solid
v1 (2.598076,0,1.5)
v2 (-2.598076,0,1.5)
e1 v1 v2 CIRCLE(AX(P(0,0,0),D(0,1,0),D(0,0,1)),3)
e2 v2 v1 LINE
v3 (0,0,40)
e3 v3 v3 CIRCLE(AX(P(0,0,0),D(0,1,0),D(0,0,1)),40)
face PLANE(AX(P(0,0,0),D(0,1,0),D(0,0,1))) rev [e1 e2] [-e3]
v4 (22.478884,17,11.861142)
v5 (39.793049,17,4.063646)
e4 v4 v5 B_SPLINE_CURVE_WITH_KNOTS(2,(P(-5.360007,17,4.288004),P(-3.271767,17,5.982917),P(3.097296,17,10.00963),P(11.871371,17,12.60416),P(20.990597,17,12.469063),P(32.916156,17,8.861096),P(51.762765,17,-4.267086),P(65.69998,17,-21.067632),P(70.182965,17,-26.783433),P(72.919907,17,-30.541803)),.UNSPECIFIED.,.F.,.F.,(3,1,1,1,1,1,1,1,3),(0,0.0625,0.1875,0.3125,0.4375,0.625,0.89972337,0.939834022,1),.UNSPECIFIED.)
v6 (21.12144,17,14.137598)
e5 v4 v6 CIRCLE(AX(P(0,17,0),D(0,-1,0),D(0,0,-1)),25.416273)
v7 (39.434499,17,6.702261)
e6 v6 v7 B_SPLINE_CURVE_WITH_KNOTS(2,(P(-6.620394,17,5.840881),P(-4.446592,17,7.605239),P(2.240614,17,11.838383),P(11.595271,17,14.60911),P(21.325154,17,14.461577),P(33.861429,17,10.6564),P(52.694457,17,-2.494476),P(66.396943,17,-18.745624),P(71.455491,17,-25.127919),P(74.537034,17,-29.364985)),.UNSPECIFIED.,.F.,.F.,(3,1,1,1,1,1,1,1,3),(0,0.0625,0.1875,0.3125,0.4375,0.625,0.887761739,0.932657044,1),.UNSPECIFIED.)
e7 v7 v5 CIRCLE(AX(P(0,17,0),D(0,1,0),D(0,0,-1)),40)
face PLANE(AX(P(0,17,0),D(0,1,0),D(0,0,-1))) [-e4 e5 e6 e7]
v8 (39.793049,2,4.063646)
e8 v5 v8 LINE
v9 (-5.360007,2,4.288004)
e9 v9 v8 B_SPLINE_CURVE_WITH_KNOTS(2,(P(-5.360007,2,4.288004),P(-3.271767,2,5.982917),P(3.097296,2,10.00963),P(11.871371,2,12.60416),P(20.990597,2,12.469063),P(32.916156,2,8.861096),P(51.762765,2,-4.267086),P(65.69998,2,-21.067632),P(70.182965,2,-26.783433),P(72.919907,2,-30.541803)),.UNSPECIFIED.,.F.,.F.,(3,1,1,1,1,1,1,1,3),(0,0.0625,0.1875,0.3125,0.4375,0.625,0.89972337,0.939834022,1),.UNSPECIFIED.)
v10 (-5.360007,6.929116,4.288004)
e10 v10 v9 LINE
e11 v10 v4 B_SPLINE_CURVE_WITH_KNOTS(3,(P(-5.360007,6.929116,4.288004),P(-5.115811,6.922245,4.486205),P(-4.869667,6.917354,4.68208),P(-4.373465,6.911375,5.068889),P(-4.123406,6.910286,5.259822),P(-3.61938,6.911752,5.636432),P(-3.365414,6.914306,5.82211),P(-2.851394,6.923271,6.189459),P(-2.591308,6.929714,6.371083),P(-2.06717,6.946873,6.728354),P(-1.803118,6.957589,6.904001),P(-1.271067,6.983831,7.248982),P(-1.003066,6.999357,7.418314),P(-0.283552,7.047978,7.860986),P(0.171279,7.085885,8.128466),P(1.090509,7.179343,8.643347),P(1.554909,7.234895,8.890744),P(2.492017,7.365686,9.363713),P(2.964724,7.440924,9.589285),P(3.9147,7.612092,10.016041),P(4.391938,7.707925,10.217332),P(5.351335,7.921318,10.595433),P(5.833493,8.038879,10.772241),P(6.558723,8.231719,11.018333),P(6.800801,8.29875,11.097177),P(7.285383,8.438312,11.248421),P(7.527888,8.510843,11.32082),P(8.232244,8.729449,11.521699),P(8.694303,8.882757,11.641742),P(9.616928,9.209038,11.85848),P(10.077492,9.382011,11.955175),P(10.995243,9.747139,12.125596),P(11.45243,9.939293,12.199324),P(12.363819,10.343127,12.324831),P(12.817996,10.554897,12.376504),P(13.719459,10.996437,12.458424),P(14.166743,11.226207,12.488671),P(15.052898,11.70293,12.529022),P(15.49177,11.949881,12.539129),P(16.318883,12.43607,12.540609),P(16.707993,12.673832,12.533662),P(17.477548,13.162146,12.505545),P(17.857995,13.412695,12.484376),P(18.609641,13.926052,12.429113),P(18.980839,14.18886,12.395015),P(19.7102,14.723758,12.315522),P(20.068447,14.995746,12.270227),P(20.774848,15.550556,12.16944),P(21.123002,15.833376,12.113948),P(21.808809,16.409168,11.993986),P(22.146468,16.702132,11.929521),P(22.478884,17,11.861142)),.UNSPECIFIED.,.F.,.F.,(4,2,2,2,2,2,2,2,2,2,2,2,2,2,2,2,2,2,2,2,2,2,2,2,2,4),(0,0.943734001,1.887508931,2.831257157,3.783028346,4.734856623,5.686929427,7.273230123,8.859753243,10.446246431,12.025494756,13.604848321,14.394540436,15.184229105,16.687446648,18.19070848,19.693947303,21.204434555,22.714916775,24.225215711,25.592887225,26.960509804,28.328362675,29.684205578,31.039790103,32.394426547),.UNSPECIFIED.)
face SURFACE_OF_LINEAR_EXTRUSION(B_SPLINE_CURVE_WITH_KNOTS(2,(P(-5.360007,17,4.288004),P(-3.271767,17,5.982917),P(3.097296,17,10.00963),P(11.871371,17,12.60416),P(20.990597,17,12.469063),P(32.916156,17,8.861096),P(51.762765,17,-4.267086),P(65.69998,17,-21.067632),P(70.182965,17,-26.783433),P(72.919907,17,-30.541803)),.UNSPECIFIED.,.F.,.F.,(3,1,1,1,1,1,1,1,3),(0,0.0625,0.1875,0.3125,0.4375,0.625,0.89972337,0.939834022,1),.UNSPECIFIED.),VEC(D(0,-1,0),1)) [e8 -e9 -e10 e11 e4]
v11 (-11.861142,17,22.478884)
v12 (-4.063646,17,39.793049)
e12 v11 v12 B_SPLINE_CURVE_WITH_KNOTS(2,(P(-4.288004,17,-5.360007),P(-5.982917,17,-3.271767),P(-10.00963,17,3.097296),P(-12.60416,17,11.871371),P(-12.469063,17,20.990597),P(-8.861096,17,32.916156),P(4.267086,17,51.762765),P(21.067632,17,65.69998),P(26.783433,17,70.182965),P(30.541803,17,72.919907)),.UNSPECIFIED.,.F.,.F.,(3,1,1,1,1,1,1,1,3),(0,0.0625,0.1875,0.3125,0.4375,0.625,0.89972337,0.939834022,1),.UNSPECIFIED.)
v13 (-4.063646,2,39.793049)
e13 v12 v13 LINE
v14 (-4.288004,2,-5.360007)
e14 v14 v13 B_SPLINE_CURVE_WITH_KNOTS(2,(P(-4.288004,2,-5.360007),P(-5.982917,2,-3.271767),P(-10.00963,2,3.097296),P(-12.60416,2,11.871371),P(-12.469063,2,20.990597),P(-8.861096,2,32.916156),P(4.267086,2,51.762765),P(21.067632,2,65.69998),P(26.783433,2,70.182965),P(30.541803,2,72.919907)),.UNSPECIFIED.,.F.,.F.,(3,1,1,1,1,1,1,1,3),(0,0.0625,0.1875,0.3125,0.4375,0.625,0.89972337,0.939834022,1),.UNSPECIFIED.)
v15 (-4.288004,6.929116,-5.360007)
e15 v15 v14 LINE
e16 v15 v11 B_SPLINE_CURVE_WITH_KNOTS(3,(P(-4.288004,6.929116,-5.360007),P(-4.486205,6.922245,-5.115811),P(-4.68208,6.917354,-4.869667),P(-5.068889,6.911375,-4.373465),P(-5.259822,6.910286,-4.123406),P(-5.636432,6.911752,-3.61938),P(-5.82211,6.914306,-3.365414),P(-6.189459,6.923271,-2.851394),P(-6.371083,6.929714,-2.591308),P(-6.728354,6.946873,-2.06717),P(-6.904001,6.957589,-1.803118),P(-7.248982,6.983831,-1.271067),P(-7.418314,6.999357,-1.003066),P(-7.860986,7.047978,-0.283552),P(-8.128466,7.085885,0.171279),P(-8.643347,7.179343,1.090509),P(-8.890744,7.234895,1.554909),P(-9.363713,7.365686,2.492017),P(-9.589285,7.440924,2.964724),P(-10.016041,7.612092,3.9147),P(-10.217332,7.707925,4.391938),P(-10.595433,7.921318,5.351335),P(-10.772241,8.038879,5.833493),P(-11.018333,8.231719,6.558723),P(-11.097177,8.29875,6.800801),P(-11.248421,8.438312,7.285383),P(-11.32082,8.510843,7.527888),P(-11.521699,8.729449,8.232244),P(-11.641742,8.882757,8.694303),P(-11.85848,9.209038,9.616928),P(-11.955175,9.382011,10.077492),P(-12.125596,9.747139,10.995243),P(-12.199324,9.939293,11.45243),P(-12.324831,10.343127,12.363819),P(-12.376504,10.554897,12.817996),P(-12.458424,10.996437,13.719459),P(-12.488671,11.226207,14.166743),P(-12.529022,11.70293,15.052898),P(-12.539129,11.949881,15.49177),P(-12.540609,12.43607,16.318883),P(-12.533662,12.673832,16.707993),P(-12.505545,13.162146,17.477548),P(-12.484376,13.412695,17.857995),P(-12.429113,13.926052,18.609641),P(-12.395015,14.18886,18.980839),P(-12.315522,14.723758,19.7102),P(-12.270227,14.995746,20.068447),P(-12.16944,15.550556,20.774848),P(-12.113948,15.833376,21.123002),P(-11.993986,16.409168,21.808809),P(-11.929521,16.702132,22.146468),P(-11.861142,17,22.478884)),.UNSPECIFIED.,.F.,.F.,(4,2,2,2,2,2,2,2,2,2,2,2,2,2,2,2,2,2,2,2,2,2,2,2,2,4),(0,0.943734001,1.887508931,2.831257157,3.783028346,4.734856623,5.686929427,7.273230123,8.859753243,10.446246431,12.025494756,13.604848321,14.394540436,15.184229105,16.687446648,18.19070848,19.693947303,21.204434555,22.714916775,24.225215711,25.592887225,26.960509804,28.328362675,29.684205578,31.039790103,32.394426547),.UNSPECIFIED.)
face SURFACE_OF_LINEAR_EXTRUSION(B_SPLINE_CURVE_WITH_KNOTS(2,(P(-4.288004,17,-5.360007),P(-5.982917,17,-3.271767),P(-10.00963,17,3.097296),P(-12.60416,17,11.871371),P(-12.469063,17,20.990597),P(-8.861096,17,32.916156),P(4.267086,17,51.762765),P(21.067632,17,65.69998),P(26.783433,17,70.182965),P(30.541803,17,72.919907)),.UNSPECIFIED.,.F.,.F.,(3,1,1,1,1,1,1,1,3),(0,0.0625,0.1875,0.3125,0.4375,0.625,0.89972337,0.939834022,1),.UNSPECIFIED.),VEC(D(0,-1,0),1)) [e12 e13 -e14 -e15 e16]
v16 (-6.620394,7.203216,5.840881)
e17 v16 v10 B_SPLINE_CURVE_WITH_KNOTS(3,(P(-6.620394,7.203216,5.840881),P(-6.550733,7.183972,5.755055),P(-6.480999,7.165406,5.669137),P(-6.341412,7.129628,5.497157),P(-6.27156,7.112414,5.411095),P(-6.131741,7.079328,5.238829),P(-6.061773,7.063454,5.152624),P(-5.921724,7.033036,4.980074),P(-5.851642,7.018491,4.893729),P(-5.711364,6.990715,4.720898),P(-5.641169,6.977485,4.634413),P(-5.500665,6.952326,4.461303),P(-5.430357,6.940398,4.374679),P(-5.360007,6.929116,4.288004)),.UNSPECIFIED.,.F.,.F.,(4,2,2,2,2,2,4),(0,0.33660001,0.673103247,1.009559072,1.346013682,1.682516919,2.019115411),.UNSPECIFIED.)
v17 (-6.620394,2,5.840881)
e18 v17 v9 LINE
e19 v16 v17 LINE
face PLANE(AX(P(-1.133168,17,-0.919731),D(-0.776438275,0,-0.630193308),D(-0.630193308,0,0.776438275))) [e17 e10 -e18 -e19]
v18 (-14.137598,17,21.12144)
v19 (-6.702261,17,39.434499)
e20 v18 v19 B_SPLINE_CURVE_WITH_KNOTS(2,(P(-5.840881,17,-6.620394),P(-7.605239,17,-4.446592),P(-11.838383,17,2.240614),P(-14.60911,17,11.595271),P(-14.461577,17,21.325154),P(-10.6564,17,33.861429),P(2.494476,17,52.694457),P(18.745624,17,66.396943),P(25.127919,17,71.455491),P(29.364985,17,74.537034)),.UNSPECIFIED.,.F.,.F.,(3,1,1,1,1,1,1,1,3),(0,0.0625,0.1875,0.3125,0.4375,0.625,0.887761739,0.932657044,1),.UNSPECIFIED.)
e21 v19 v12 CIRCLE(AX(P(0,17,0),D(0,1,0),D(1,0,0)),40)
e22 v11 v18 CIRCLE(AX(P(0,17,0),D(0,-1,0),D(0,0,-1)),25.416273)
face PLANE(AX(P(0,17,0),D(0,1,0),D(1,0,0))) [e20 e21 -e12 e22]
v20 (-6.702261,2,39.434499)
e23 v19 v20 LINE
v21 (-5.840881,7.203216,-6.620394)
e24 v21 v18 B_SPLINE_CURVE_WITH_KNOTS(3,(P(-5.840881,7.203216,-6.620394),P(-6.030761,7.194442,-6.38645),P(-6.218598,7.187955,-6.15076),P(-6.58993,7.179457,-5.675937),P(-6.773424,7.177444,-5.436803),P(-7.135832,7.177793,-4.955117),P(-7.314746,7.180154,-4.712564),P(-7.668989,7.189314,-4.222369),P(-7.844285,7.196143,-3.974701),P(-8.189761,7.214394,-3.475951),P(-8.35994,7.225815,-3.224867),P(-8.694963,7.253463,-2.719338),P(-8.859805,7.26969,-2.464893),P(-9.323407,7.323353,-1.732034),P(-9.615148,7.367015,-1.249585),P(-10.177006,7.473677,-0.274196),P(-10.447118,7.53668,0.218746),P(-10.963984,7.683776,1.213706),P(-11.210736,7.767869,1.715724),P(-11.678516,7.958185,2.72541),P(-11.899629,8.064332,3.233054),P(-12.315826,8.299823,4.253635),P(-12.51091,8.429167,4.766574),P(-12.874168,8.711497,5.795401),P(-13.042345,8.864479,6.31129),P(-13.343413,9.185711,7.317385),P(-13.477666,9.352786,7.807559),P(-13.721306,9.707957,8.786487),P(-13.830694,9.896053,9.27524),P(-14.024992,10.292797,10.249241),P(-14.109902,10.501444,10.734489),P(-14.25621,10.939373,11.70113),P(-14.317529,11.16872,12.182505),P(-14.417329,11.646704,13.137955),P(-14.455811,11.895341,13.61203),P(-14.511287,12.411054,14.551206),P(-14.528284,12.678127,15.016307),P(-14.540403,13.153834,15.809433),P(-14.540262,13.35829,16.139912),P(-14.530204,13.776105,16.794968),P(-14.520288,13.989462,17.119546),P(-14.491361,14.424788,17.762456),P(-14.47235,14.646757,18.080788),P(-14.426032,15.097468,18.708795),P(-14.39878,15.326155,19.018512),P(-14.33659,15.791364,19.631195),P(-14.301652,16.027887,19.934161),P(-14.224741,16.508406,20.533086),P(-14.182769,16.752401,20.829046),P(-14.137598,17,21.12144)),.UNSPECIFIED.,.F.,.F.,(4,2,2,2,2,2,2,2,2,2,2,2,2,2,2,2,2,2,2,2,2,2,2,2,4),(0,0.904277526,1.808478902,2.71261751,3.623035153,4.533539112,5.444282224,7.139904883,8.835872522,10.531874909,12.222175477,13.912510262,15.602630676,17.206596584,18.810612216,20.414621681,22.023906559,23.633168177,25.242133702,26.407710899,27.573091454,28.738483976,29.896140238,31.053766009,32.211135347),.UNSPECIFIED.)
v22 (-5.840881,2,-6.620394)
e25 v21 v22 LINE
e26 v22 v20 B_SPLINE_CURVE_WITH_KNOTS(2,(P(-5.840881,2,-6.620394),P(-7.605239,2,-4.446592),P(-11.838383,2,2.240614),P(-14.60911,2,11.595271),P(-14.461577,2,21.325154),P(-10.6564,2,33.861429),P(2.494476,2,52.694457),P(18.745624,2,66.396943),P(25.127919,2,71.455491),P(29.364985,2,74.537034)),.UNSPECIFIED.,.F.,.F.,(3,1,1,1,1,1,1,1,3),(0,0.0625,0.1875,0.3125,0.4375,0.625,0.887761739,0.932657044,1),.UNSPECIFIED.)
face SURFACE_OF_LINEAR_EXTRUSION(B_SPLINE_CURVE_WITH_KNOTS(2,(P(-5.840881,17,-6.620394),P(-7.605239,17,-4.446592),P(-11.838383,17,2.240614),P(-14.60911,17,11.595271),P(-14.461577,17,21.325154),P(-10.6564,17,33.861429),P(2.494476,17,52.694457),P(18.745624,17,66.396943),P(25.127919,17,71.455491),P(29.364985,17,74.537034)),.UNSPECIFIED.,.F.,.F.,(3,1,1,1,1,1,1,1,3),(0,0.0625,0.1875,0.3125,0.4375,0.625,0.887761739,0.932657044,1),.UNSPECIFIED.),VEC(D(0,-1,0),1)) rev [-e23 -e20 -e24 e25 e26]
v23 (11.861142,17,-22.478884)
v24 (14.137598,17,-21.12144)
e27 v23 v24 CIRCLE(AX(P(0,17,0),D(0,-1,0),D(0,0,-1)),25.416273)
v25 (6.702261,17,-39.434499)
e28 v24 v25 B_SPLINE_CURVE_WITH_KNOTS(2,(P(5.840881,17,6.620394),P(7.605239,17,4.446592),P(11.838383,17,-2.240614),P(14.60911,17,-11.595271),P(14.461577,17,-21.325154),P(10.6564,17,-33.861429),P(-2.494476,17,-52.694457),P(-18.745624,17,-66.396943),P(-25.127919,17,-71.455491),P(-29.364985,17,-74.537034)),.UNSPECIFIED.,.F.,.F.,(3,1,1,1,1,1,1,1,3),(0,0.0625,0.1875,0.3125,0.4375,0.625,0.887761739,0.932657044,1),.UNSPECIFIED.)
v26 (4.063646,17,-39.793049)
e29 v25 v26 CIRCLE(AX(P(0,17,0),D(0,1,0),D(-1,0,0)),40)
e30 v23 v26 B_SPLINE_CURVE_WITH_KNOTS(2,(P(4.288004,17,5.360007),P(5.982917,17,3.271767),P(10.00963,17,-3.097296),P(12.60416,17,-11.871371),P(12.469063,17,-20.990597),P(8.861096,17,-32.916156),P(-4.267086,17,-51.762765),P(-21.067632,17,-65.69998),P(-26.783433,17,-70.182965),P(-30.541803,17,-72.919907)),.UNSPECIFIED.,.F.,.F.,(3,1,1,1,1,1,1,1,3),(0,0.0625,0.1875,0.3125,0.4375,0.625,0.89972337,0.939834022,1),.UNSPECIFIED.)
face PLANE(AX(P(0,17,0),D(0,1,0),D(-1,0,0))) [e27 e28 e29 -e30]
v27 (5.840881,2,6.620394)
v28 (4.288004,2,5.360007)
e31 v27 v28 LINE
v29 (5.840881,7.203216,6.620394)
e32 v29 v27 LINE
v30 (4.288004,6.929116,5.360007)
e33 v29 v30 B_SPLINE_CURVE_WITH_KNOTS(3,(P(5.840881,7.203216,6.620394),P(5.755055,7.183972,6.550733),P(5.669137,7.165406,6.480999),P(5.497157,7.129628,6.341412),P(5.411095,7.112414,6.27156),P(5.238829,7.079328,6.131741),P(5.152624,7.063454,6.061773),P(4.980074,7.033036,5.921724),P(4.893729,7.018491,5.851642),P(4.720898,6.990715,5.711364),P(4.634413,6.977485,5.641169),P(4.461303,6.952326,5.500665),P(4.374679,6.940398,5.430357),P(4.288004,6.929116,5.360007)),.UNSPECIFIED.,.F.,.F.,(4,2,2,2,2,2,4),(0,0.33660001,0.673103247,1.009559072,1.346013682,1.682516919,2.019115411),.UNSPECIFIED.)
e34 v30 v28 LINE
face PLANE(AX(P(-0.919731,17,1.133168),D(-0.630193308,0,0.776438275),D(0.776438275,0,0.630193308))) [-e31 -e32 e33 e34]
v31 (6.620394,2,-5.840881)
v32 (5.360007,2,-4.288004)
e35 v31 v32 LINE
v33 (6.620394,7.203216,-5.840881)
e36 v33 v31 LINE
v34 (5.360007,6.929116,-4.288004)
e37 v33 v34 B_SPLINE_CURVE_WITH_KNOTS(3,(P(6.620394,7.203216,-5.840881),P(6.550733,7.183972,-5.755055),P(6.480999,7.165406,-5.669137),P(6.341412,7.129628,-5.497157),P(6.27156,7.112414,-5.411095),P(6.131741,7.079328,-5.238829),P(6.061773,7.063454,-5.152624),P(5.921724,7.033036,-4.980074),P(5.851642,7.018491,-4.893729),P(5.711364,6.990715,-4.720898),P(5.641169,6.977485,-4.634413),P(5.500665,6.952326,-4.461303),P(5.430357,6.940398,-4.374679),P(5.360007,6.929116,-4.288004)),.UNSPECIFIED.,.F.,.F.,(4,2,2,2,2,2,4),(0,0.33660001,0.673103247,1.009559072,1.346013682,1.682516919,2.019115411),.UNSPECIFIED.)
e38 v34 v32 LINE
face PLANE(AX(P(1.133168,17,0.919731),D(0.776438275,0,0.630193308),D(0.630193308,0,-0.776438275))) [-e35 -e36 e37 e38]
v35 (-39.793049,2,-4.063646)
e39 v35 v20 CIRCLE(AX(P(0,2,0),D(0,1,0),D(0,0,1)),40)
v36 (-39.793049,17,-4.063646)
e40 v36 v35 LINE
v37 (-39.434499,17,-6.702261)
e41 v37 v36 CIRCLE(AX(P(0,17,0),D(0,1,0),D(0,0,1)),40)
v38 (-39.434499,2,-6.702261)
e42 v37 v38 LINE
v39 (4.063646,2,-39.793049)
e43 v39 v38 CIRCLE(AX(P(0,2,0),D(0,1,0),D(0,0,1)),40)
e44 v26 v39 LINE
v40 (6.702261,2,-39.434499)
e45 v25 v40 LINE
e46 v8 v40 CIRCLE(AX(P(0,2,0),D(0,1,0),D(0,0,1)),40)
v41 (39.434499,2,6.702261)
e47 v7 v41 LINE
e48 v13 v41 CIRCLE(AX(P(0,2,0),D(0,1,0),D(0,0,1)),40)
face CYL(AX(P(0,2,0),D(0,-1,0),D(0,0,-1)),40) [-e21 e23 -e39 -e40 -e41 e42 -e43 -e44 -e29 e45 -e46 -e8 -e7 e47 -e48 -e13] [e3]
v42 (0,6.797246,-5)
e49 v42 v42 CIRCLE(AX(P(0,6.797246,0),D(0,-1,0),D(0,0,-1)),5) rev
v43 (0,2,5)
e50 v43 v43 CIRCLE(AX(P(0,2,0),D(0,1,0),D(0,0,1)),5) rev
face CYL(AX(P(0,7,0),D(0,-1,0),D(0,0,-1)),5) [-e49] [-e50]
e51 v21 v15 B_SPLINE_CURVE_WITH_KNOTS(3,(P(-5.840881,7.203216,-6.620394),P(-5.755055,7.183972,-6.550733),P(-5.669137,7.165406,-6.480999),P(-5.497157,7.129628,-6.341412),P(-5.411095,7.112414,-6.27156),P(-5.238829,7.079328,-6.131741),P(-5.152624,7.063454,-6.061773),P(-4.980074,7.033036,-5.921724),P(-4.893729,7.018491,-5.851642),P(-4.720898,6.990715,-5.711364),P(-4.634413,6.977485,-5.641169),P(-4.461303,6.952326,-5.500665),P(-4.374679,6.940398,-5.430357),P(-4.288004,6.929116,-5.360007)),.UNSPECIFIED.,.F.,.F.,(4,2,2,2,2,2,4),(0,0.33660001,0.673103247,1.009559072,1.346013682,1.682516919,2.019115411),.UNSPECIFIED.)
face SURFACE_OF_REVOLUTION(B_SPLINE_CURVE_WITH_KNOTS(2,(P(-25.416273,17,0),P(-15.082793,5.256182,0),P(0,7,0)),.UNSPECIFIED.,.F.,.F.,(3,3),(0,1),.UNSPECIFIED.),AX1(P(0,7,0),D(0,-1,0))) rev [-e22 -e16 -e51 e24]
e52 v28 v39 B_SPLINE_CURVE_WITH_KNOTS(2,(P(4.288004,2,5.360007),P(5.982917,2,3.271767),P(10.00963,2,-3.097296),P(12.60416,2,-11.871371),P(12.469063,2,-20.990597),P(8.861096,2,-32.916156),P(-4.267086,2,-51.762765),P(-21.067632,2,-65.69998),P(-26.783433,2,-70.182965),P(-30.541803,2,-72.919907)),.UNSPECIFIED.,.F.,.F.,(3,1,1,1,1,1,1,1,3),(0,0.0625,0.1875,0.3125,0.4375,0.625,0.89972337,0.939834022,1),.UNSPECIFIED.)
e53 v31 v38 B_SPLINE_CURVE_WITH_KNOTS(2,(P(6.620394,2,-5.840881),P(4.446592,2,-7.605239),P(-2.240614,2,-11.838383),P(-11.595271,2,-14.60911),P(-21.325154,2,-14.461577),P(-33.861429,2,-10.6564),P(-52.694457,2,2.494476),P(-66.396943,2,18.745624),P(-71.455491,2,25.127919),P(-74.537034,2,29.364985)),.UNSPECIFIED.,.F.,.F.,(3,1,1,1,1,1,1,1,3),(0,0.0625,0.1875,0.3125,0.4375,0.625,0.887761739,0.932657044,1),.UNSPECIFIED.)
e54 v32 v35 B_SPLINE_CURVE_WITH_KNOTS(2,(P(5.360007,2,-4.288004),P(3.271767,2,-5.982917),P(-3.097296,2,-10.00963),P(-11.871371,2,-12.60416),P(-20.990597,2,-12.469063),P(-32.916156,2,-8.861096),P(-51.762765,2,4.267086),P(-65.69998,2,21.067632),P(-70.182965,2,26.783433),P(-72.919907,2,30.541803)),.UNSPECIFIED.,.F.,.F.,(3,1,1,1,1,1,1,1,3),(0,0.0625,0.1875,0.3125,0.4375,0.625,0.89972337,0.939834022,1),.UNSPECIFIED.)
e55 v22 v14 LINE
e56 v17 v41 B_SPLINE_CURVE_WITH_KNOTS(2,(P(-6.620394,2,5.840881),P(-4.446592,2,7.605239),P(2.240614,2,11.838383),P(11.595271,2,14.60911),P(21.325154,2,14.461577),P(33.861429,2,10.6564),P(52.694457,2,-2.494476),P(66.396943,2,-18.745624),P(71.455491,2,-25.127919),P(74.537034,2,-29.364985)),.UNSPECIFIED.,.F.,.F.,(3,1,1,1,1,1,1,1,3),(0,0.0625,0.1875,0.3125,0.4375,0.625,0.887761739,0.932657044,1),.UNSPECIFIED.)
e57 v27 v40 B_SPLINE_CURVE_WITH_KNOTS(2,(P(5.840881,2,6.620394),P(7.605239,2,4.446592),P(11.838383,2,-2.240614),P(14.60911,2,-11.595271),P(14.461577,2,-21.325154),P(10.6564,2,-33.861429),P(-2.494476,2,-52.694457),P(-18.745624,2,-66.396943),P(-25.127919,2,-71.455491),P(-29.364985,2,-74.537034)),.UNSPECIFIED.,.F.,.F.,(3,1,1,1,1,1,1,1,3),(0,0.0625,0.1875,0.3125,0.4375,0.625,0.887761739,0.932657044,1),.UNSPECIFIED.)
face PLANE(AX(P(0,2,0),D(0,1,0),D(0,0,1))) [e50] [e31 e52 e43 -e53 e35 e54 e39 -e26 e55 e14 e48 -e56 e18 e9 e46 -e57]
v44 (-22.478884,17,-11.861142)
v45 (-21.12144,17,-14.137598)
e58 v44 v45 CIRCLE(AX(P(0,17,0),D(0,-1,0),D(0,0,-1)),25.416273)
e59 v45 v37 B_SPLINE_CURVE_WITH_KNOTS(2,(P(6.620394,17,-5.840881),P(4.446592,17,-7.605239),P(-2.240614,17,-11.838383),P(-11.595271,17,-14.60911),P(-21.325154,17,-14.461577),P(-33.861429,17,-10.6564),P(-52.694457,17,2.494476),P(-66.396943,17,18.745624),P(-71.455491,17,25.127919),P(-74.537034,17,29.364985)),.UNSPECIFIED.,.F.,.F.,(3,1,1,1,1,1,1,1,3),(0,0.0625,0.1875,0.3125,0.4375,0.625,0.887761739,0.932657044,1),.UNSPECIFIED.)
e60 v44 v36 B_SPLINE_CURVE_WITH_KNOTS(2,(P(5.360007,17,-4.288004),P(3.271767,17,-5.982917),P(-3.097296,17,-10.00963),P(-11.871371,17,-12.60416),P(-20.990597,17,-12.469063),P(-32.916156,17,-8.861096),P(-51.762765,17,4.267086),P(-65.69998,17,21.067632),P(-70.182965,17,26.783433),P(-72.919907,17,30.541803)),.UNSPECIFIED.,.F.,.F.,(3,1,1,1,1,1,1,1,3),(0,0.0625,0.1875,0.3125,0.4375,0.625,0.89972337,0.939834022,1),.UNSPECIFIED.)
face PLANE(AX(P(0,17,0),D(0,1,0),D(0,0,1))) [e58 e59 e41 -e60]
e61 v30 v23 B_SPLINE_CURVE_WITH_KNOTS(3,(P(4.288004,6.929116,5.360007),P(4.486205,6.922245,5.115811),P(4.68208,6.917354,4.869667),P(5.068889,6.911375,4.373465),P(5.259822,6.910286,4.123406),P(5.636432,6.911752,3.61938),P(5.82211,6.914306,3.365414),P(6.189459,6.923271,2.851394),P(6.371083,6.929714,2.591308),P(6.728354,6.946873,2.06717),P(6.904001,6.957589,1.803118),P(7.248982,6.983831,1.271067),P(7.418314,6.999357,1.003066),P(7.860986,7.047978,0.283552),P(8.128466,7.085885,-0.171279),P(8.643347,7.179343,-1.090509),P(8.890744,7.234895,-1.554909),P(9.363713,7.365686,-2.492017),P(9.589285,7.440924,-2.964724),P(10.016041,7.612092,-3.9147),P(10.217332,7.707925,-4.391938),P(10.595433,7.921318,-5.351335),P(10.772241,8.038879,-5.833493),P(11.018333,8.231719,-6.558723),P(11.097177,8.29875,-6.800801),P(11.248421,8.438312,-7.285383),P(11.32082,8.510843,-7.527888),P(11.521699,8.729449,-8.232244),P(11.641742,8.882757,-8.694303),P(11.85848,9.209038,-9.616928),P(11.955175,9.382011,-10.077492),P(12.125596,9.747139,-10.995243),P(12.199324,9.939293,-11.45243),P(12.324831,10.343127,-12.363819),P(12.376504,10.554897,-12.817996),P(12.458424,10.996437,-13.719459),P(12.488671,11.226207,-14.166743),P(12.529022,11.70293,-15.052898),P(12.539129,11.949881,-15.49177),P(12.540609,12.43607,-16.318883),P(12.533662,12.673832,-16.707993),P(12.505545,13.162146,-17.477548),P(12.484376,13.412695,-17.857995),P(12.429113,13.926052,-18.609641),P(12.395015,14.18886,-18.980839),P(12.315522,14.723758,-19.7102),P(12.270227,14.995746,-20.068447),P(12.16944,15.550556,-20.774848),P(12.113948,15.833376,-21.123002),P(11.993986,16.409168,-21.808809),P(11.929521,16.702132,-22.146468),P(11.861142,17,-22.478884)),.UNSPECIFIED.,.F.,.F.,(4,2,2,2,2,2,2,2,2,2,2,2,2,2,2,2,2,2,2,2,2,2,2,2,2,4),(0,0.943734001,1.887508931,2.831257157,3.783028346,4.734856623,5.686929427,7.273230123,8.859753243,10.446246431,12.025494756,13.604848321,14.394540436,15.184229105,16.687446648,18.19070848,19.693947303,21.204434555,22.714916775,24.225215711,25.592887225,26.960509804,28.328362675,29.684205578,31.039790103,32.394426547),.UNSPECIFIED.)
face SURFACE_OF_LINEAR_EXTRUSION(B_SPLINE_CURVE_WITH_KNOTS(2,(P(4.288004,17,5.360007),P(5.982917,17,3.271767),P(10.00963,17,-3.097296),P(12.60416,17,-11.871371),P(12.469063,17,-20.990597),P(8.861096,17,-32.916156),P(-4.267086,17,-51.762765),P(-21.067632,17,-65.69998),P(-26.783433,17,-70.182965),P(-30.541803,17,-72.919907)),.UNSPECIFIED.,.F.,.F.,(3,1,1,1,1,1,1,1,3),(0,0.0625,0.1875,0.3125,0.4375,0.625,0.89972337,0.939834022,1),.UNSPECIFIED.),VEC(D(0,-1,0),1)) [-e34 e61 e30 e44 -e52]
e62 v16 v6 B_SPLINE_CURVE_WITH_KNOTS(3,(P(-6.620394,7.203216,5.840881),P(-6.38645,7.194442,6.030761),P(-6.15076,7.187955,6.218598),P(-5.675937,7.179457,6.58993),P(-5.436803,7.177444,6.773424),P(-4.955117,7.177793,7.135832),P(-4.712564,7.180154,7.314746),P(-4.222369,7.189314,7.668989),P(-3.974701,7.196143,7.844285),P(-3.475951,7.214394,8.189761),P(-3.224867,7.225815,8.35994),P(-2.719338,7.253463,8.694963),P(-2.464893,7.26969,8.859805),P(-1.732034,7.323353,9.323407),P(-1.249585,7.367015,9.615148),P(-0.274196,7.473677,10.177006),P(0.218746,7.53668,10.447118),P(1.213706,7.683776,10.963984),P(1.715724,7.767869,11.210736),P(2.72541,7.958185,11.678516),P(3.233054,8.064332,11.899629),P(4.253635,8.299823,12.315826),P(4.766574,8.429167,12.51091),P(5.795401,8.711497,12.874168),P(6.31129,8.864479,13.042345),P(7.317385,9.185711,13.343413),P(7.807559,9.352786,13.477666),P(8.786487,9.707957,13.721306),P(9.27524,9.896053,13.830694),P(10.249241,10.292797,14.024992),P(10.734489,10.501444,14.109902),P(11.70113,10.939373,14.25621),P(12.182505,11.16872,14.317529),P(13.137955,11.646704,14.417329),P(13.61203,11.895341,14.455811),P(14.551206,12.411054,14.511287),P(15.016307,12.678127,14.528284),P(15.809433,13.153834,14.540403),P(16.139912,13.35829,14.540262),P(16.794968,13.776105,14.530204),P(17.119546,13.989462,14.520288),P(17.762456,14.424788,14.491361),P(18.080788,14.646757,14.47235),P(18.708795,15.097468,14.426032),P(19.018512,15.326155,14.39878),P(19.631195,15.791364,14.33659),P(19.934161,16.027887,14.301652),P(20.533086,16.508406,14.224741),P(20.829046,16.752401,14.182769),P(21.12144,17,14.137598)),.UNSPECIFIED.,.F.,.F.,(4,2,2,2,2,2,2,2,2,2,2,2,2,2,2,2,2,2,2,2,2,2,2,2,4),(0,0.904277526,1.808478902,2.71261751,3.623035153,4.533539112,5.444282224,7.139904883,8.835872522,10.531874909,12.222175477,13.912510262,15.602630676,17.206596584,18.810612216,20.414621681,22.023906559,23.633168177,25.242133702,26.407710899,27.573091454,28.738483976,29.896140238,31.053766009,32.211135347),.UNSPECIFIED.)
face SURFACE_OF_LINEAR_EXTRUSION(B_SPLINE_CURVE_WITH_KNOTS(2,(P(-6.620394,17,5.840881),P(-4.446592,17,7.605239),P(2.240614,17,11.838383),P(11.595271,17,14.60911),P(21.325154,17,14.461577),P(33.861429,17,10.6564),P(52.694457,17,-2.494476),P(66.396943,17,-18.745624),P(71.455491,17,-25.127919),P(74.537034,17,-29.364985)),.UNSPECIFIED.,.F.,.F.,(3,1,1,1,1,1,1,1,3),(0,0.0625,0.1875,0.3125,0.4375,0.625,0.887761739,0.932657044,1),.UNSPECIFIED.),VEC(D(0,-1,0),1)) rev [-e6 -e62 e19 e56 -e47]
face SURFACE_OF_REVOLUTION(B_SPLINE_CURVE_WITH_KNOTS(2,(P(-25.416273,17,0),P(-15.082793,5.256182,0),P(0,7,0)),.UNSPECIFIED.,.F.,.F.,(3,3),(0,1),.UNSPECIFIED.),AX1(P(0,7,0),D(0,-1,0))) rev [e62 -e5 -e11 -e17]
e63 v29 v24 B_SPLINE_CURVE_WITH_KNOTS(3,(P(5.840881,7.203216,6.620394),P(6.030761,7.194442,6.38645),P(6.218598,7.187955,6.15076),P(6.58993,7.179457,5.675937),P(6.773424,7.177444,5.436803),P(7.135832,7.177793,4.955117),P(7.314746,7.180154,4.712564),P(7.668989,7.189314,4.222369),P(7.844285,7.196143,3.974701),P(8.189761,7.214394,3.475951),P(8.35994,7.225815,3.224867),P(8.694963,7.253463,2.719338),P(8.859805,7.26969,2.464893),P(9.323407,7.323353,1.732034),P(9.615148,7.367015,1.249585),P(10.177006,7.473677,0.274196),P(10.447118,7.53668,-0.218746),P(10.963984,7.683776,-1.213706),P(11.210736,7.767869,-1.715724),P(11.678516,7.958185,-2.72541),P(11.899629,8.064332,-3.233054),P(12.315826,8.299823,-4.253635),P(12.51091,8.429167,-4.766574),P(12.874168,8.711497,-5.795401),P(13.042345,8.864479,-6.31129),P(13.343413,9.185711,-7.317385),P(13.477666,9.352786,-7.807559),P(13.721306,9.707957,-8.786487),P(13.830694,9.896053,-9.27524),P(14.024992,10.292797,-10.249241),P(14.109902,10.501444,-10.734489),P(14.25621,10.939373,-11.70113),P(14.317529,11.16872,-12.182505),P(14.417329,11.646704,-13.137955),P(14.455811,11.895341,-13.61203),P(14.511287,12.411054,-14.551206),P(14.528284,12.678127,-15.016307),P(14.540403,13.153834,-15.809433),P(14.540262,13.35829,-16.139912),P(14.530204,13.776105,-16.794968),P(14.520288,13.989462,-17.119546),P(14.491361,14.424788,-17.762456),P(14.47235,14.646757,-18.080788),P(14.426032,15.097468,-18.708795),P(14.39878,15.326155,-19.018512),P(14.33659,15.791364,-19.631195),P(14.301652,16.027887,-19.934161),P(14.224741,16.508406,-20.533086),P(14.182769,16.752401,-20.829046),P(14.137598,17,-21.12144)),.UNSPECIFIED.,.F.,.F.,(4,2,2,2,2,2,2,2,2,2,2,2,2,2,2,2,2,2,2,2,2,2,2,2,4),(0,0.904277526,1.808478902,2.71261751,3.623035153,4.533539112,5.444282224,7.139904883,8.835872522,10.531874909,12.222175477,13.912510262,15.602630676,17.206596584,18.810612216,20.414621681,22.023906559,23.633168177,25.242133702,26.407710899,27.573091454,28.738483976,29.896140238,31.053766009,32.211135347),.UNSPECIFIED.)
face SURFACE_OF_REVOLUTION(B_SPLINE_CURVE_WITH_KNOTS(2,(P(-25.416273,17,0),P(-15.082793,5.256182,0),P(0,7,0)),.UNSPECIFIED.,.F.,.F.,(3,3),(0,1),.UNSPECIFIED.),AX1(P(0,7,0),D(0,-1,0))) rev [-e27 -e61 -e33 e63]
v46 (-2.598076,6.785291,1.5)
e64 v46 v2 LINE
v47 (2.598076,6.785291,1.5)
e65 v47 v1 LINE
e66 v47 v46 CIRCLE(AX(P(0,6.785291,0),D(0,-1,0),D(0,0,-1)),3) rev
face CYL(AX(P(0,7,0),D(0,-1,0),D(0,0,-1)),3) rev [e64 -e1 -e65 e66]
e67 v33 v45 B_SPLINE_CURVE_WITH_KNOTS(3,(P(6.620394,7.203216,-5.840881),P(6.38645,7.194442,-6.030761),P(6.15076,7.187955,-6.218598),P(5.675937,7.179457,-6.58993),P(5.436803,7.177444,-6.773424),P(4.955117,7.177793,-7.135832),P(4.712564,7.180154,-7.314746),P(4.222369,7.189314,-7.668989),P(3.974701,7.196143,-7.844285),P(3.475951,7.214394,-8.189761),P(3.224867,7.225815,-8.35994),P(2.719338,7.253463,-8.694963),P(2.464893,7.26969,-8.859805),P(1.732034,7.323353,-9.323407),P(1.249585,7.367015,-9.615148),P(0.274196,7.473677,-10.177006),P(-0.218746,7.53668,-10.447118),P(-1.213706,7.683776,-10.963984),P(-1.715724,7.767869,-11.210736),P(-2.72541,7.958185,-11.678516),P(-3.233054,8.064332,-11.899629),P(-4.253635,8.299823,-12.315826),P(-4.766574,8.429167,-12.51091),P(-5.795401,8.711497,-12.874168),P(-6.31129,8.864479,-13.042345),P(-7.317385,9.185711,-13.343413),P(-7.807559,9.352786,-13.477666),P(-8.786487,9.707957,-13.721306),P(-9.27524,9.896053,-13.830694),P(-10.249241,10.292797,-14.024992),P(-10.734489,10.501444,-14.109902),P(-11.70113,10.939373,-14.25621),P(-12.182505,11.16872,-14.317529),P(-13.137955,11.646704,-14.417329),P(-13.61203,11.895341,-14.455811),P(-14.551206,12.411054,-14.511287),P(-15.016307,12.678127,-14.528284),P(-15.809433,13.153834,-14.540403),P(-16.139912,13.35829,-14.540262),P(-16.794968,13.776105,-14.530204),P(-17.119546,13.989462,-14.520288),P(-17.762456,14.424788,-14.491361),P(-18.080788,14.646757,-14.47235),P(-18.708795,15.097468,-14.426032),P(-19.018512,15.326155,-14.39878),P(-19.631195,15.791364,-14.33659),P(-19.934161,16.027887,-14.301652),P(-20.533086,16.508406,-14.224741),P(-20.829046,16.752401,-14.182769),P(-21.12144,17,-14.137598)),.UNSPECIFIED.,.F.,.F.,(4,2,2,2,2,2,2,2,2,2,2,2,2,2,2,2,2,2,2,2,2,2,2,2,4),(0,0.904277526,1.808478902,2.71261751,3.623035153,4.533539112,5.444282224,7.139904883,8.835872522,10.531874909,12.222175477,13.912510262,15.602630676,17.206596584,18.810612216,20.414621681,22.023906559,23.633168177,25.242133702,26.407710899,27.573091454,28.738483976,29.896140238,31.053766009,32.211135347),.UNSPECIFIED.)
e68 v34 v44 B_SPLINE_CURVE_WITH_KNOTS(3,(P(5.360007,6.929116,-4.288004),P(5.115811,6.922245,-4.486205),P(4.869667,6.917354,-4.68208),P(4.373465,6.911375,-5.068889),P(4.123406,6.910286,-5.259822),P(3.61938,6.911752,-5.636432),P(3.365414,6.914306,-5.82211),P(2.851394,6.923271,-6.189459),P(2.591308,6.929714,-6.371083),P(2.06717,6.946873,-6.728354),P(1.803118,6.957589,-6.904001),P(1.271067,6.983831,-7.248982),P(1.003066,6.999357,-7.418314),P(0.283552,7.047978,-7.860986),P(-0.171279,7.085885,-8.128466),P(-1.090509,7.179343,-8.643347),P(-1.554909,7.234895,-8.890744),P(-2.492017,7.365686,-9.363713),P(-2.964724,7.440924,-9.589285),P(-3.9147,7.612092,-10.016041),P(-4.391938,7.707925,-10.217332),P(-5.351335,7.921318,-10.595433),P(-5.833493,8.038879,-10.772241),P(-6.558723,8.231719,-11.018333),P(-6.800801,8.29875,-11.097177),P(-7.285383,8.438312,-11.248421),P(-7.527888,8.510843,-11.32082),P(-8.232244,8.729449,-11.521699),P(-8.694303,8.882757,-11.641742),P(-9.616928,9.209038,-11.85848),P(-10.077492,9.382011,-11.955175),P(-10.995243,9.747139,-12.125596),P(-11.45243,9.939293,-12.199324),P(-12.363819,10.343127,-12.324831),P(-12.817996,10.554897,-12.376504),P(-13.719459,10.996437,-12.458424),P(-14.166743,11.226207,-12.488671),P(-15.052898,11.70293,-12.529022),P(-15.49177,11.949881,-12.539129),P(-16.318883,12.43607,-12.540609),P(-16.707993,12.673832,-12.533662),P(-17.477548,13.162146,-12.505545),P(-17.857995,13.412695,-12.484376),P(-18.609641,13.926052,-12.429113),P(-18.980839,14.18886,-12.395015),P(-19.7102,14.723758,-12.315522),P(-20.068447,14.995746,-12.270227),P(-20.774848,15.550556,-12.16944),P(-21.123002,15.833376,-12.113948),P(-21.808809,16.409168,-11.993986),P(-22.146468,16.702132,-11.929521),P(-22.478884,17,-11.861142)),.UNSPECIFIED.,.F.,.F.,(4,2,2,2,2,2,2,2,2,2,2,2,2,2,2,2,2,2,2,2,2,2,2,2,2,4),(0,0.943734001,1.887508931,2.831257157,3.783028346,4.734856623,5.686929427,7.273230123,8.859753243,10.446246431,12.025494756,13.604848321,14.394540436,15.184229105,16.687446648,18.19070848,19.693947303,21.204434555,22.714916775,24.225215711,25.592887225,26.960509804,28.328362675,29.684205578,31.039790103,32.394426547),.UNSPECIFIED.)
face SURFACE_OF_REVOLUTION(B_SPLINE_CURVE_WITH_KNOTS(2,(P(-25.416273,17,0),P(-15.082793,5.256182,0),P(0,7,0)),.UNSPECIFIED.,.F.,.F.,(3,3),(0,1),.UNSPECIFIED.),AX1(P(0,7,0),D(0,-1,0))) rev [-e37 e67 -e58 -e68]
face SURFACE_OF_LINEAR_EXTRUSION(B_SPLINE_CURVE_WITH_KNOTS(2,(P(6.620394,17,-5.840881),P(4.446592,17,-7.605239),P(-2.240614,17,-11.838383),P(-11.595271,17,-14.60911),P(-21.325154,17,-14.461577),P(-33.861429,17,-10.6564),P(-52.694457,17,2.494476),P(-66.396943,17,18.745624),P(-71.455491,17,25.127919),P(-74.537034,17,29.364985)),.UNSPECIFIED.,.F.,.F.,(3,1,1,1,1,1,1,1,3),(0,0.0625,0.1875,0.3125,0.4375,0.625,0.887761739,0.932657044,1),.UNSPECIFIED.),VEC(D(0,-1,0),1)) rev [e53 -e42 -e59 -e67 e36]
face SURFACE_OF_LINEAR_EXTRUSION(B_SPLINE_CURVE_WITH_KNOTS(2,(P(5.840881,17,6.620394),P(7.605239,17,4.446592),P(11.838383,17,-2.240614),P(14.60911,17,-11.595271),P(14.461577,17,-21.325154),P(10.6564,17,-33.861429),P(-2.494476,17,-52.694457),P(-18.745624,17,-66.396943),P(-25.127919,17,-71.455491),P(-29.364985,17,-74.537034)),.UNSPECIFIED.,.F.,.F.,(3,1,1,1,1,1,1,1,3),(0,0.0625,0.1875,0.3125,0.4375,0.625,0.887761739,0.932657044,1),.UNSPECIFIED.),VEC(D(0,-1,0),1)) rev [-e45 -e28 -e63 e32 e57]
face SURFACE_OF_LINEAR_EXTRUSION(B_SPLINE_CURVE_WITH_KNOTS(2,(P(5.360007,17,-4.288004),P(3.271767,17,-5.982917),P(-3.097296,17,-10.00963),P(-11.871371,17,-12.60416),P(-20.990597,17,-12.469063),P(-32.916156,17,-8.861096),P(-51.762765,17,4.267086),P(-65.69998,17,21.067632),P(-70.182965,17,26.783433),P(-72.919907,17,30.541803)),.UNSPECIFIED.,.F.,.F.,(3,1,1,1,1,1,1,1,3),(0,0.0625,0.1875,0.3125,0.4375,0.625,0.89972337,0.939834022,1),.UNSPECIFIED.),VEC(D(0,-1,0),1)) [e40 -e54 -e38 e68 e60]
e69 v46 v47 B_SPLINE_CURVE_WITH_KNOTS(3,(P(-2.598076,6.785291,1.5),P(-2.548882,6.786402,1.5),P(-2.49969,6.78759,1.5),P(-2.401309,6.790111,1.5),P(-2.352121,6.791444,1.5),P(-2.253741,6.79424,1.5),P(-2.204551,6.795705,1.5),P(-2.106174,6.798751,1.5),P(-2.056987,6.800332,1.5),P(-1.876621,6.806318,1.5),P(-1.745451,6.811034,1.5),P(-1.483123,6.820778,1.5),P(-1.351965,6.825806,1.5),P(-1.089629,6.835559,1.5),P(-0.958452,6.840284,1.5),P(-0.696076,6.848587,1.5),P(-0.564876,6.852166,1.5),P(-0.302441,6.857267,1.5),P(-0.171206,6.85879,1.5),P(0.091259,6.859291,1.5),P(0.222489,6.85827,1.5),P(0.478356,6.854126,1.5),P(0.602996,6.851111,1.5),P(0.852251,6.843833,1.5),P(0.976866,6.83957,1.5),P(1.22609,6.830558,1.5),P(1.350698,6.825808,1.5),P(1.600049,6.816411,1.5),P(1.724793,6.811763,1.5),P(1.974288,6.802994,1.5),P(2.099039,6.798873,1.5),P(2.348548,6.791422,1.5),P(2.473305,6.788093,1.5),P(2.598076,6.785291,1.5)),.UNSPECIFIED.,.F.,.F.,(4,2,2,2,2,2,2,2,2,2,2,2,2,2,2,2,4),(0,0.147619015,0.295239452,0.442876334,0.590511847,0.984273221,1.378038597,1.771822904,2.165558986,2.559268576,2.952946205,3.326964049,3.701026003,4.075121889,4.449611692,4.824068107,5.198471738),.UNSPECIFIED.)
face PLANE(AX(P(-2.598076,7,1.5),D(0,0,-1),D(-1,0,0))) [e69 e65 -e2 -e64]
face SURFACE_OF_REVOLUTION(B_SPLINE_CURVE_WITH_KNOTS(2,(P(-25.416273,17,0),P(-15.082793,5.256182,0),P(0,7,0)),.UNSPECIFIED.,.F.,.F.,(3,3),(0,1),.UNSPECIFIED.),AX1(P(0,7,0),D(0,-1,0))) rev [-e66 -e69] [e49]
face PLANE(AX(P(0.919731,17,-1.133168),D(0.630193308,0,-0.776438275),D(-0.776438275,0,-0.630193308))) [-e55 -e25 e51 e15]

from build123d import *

# Parameters (mm, degrees)
SKETCH1_R           = 40
BOSS_EXTRUDE1_DEPTH = 2
SKETCH2_R           = 5
BOSS_EXTRUDE2_DEPTH = 7
CUT_EXTRUDE2_DEPTH  = 58
BOSS_EXTRUDE4_DEPTH = 15
CIRPATTERN1_COUNT   = 4


# Read off the part's stored shape, not the designer's step: Boss-Extrude4
with BuildPart() as part:
    # Sketch1 → Boss-Extrude1 (new body)
    with BuildSketch(Plane(origin=(0, 0, 0), x_dir=(1, 0, 0), z_dir=(0, 1, 0))):
        with Locations(Location((0, 0, 0), (0, 0, 270))):
            Circle(SKETCH1_R)
    extrude(amount=BOSS_EXTRUDE1_DEPTH)

    # Sketch2 → Boss-Extrude2 (add)
    with BuildSketch(Plane(origin=(0, 0, 0), x_dir=(1, 0, 0), z_dir=(0, 1, 0))):
        with Locations(Location((0, 0, 0), (0, 0, 270))):
            Circle(SKETCH2_R)
    extrude(amount=BOSS_EXTRUDE2_DEPTH)

    # Sketch4 → Cut-Extrude2 (cut, through all)
    with BuildSketch(Plane(origin=(0, 0, 0), x_dir=(1, 0, 0), z_dir=(0, 1, 0))):
        with BuildLine():
            Line((-2.598076211, -1.5), (2.598076211, -1.5))
            ThreePointArc((2.598076211, -1.5), (0, 3), (-2.598076211, -1.5))
        make_face()
    extrude(amount=CUT_EXTRUDE2_DEPTH, mode=Mode.SUBTRACT)

    # Boss-Extrude4 outline → Boss-Extrude4 (add)
    with BuildSketch(Plane(origin=(0, 2, 0), x_dir=(1, 0, 0), z_dir=(0, 1, 0))):
        with BuildLine():
            Line((5.360007285, 4.288004046), (6.620393902, 5.840880595))
            add(Edge.make_bspline(
                [(6.620393902, 5.840880595), (4.446591581, 7.60523936), (-2.240614046, 11.838382972), (-11.595270921, 14.60910996), (-21.325153615, 14.461577349), (-32.769869479, 10.987725064), (-39.434498844, 6.70226088)],
                knots=[0, 0, 0, 0.0625, 0.1875, 0.3125, 0.4375, 0.597789977, 0.597789977, 0.597789977], degree=2))
            ThreePointArc((-39.434498844, 6.70226088), (-39.635737327, 5.385937855), (-39.793049423, 4.063645853))
            add(Edge.make_bspline(
                [(5.360007285, 4.288004046), (3.271766893, 5.982916783), (-3.097296011, 10.009630326), (-11.871370928, 12.604159995), (-20.990596912, 12.469062744), (-32.556083101, 8.970033013), (-39.793049423, 4.063645853)],
                knots=[0, 0, 0, 0.0625, 0.1875, 0.3125, 0.4375, 0.615564575, 0.615564575, 0.615564575], degree=2))
        make_face()
    boss_extrude4 = extrude(amount=BOSS_EXTRUDE4_DEPTH)

    # CirPattern1: Boss-Extrude4 ×4 about axis
    cirpattern1_axis = Axis((0, 7, 0), (0, 1, 0))
    for i in range(1, CIRPATTERN1_COUNT):
        add(boss_extrude4.rotate(cirpattern1_axis, i * 360 / CIRPATTERN1_COUNT))

    # Sketch6 → Cut-Revolve1 (revolve, cut)
    with BuildSketch(Plane.XY, mode=Mode.PRIVATE) as cut_revolve1_sk:
        with BuildLine():
            Line((0, 7), (0, 17))
            Line((0, 17), (-25.416272602, 17))
            add(Edge.make_bspline(
                [(0, 7), (-15.082792744, 5.256181573), (-25.416272602, 17)],
                knots=[0, 0, 0, 1, 1, 1], degree=2))
        make_face()
    revolve(cut_revolve1_sk.sketch.rotate(Axis((0, 7, 0), (0, 1, 0)), 270), axis=Axis((0, 7, 0), (0, 1, 0)), mode=Mode.SUBTRACT)


solid = part.part
